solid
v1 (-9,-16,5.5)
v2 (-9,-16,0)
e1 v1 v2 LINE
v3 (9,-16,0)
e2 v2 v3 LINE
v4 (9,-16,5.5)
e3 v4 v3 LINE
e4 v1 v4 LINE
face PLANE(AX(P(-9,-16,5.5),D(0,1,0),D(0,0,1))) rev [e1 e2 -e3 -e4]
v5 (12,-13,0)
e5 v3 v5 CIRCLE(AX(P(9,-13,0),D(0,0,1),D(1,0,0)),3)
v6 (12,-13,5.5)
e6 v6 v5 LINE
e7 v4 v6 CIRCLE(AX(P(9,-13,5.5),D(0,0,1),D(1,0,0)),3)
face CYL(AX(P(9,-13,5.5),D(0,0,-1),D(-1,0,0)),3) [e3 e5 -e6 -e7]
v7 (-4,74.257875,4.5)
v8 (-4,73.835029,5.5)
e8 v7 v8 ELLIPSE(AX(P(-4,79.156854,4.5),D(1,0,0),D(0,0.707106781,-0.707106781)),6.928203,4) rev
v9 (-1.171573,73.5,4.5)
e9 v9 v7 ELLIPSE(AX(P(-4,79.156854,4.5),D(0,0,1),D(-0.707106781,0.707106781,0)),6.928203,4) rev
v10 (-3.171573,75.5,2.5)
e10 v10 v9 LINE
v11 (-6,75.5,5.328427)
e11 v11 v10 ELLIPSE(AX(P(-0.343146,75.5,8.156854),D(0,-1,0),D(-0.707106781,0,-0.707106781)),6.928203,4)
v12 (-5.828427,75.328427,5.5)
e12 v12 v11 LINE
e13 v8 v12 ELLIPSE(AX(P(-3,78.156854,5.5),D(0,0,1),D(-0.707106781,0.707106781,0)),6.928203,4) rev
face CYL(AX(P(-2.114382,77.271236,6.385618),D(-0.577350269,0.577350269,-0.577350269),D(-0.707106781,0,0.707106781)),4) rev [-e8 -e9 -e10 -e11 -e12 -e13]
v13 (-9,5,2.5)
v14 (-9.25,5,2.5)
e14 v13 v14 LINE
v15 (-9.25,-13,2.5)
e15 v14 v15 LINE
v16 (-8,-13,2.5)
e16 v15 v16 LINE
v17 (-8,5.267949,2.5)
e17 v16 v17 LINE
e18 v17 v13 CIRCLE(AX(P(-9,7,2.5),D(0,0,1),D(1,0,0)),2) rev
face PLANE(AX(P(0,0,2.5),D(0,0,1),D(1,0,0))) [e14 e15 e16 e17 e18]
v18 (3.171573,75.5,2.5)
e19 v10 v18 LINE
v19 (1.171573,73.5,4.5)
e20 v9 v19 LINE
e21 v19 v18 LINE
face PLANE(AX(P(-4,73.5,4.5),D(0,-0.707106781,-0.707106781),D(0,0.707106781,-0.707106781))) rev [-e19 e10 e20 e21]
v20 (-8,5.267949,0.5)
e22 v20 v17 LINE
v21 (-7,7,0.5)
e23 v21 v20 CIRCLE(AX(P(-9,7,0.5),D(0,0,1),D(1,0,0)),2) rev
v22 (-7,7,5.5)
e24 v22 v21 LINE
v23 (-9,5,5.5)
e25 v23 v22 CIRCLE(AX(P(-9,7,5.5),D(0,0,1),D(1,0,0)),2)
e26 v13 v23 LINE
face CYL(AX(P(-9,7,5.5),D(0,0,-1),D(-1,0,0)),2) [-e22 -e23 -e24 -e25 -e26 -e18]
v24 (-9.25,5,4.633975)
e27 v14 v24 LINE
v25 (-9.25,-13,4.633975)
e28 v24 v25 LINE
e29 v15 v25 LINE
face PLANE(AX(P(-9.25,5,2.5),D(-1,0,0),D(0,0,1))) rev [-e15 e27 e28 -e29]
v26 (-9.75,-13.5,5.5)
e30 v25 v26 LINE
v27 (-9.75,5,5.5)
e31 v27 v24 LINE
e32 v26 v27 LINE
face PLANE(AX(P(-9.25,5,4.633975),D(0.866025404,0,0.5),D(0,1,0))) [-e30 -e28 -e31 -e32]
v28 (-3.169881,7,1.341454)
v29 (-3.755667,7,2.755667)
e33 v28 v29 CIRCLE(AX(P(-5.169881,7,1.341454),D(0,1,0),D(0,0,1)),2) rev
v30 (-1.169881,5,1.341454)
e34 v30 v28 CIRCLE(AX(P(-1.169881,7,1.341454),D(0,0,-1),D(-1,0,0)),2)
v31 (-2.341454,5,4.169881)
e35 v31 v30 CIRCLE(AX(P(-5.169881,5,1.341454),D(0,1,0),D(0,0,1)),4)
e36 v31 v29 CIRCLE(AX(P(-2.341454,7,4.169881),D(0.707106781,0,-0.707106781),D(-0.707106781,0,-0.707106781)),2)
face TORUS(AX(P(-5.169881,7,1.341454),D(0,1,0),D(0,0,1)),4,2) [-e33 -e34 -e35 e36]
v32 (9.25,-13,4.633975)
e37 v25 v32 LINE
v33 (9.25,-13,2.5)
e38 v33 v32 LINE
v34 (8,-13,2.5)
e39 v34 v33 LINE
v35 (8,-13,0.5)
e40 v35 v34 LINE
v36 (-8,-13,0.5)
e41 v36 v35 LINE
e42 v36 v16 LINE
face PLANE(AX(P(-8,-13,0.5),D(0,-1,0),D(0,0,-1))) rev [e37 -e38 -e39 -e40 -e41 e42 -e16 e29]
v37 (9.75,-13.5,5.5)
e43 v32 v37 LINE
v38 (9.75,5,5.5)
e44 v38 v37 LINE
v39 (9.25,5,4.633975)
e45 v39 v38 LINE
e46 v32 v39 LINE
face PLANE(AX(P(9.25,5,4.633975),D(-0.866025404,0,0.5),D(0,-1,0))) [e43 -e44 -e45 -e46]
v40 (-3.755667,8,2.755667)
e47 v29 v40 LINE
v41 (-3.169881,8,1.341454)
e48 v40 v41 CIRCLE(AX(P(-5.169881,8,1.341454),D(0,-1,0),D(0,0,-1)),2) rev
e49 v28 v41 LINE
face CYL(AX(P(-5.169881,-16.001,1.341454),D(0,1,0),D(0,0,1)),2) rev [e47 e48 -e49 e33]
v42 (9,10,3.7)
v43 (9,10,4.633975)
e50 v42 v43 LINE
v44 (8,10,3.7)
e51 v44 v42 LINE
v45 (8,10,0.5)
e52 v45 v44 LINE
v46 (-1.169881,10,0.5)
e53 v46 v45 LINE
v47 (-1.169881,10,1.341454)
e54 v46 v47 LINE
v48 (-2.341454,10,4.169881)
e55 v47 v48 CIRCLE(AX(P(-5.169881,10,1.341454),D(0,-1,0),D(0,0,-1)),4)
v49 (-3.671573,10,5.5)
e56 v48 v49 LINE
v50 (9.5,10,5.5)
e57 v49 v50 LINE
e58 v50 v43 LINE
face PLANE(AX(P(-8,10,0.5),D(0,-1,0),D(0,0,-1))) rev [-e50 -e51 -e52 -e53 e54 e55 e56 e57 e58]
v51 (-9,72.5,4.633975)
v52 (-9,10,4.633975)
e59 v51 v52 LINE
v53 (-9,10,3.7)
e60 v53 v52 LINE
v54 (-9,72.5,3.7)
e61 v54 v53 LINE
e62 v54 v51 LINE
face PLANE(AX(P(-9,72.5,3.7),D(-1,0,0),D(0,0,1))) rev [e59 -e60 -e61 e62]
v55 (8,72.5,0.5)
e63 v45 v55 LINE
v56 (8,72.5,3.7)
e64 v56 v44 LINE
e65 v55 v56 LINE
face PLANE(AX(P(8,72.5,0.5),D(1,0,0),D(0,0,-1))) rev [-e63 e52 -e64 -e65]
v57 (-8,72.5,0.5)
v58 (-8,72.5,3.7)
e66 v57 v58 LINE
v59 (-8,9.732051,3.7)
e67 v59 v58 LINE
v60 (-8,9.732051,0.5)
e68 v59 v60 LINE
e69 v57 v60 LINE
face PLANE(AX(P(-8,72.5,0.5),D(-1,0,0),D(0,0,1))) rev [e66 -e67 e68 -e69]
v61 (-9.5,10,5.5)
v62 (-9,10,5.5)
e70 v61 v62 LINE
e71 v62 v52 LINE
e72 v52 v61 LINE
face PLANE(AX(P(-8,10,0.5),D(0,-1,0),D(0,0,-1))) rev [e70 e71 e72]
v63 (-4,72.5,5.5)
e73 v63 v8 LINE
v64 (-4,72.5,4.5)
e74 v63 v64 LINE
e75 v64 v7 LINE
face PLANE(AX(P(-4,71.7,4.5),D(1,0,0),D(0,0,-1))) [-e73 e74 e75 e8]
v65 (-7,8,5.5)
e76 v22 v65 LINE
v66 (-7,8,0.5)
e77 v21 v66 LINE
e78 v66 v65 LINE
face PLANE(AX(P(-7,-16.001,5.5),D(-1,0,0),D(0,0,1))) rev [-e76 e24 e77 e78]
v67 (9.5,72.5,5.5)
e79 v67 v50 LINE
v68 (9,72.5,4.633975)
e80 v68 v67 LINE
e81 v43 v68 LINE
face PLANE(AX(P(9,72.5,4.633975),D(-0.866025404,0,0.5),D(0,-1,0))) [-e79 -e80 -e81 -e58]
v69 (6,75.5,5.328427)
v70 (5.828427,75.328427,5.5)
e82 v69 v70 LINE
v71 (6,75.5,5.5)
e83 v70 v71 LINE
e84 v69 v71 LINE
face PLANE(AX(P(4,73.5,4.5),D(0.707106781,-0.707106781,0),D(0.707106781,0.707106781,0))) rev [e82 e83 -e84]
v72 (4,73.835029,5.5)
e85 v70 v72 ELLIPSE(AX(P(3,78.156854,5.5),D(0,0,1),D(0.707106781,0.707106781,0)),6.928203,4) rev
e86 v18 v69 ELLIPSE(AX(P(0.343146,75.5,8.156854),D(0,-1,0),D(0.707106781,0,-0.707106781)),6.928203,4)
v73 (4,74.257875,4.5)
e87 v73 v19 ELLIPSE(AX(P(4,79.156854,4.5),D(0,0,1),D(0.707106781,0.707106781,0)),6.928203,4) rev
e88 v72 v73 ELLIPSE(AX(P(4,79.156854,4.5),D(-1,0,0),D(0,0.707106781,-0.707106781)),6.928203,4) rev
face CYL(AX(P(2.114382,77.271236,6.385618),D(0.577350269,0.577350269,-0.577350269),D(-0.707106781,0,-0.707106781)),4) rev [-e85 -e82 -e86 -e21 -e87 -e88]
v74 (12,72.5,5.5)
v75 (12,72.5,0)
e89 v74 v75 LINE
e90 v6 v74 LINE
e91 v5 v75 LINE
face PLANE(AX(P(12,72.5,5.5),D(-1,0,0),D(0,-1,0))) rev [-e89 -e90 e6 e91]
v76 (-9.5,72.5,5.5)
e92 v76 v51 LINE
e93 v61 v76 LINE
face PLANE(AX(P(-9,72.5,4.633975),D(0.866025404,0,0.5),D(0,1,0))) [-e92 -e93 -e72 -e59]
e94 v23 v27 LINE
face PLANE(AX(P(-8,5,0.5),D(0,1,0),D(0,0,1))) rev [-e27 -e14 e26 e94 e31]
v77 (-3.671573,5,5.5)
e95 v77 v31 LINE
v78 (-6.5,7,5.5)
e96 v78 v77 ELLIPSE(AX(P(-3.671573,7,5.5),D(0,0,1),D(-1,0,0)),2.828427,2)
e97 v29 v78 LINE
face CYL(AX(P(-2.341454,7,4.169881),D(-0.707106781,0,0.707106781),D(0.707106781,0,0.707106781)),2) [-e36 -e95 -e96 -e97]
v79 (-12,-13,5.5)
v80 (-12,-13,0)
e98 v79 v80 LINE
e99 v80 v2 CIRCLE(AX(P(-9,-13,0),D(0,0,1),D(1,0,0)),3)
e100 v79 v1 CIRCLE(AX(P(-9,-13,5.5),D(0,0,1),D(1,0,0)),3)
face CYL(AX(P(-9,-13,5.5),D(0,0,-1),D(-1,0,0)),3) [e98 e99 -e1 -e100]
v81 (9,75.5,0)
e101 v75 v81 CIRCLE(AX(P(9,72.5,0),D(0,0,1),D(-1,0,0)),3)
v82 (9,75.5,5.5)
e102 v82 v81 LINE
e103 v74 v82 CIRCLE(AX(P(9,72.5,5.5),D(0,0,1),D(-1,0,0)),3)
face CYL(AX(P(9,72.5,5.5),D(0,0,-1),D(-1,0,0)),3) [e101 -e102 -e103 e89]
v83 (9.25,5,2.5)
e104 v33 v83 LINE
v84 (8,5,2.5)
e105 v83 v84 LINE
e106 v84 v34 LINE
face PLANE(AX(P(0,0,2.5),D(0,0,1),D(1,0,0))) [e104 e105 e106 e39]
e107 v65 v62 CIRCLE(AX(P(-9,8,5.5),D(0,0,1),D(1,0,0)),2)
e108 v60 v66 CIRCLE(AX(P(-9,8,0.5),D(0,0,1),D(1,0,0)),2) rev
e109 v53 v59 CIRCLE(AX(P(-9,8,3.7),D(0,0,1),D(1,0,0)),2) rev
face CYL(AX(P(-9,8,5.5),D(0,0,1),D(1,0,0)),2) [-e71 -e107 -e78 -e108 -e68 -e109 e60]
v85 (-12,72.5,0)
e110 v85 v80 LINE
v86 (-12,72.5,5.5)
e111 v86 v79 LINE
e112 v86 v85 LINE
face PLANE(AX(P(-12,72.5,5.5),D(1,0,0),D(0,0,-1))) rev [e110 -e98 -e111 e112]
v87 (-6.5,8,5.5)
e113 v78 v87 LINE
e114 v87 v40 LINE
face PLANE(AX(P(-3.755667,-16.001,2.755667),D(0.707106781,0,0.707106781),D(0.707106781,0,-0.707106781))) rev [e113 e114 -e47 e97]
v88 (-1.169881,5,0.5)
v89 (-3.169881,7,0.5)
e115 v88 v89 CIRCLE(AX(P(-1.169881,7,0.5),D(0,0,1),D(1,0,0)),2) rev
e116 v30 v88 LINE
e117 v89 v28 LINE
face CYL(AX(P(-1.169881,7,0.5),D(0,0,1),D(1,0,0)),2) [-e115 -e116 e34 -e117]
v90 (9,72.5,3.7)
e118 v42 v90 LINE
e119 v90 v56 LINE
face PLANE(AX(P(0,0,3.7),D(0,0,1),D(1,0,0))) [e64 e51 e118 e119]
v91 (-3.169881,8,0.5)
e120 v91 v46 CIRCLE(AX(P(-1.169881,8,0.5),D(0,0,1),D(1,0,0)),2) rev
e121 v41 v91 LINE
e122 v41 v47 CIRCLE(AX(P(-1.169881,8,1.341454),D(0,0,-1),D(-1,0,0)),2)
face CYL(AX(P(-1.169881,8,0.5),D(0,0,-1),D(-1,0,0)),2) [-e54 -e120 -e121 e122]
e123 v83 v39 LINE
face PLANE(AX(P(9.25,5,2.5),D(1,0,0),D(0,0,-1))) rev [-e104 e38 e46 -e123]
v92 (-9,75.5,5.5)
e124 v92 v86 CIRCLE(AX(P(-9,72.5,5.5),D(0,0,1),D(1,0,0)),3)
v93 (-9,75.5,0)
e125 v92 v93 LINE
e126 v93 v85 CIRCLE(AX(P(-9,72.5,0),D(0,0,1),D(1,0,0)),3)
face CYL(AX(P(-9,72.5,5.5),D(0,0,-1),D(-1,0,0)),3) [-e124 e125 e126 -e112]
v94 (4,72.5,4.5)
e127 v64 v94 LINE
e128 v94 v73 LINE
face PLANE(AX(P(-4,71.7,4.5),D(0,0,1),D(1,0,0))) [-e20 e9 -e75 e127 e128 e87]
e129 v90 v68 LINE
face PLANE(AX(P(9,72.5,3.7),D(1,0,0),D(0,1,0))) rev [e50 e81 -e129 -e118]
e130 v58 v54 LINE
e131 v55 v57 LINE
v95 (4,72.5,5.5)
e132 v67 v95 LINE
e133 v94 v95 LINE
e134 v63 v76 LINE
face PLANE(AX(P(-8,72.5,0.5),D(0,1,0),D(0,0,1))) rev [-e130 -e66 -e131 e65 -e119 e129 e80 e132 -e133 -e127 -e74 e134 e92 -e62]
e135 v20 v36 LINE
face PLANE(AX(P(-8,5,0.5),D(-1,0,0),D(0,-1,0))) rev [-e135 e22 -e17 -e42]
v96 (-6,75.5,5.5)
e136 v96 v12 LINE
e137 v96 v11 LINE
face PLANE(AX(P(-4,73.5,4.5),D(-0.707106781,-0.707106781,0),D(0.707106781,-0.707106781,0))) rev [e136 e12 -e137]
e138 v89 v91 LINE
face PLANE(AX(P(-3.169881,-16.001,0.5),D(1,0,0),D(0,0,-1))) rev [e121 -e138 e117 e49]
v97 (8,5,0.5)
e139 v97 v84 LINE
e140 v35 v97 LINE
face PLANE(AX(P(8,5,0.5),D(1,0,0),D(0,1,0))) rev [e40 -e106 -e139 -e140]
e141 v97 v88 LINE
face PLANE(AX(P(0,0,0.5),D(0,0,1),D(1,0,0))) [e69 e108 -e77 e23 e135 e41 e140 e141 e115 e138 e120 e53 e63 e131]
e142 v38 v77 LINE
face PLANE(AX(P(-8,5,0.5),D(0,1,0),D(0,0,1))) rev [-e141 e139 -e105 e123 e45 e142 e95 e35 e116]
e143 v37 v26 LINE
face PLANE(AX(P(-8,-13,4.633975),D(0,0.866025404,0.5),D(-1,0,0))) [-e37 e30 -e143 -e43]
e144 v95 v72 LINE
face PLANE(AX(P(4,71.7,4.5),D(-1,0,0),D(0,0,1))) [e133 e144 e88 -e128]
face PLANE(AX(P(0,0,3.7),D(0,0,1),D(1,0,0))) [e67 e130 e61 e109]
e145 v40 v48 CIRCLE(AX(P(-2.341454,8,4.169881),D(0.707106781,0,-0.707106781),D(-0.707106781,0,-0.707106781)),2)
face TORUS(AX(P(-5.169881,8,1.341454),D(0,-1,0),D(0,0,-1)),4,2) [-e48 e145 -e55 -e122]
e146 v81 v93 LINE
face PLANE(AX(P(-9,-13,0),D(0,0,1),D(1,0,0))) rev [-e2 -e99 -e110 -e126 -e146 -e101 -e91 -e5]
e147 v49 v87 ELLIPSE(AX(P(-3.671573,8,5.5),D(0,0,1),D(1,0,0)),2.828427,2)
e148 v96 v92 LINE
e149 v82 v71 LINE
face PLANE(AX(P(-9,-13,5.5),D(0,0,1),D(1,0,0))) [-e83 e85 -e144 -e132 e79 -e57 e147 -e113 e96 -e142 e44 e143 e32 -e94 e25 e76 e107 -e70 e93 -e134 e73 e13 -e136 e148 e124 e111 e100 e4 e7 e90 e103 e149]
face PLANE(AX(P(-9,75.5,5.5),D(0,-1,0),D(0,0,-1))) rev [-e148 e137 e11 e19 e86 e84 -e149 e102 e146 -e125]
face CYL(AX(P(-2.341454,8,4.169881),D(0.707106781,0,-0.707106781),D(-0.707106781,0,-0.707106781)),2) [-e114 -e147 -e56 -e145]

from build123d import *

# Parameters (mm, degrees)
BOSS_EXTRUDE1_DEPTH          = 5.5
SKETCH4_W                    = 16
SKETCH4_H                    = 62.5
SKETCH4_H_2                  = 18
CUT_EXTRUDE1_DEPTH           = 5
SKETCH5_W                    = 18.5
SKETCH5_H                    = 18
CUT_EXTRUDE2_DEPTH           = 3
SKETCH7_W                    = 18
SKETCH7_H                    = 62.5
CUT_EXTRUDE3_DEPTH           = 1.8
CUT_EXTRUDE4_START           = -1
SKETCH10_W                   = 8
SKETCH10_H                   = 1
CUT_EXTRUDE4_DEPTH           = 89.479047827
CUT_EXTRUDE4_TAPER           = -45
CUT_EXTRUDE4_OTHER_WAY_DEPTH = 1.8
FILLET1_R                    = 4
CHAMFER1_SIZE                = 0.5
CHAMFER1_SIZE2               = 0.866025404
CUT_EXTRUDE5_REACH           = 68.817
FILLET2_R                    = 2
FILLET3_R                    = 2


with BuildPart() as part:
    # Sketch2 → Boss-Extrude1 (new body)
    with BuildSketch(Plane.XY):
        with BuildLine():
            Line((-9, 75.5), (9, 75.5))
            ThreePointArc((9, 75.5), (11.121320344, 74.621320344), (12, 72.5))
            Line((12, 72.5), (12, -13))
            ThreePointArc((12, -13), (11.121320344, -15.121320344), (9, -16))
            Line((9, -16), (-9, -16))
            ThreePointArc((-9, -16), (-11.121320344, -15.121320344), (-12, -13))
            Line((-12, -13), (-12, 72.5))
            ThreePointArc((-12, 72.5), (-11.121320344, 74.621320344), (-9, 75.5))
        make_face()
    extrude(amount=BOSS_EXTRUDE1_DEPTH)

    # Sketch4 → Cut-Extrude1 (cut)
    with BuildSketch(Plane.XY.offset(5.5)):
        with Locations((0, 41.25)):
            Rectangle(SKETCH4_W, SKETCH4_H)
        with Locations((0, -4)):
            Rectangle(SKETCH4_W, SKETCH4_H_2)
    extrude(amount=-CUT_EXTRUDE1_DEPTH, mode=Mode.SUBTRACT)

    # Sketch5 → Cut-Extrude2 (cut)
    with BuildSketch(Plane.XY.offset(5.5)):
        with Locations((0, -4)):
            Rectangle(SKETCH5_W, SKETCH5_H)
    extrude(amount=-CUT_EXTRUDE2_DEPTH, mode=Mode.SUBTRACT)

    # Sketch7 → Cut-Extrude3 (cut)
    with BuildSketch(Plane.XY.offset(5.5)):
        with Locations((0, 41.25)):
            Rectangle(SKETCH7_W, SKETCH7_H)
    extrude(amount=-CUT_EXTRUDE3_DEPTH, mode=Mode.SUBTRACT)

    # Sketch10 → Cut-Extrude4 (cut)
    with BuildSketch(Plane.XZ.offset(-72.5).offset(CUT_EXTRUDE4_START)):
        with Locations((0, 5)):
            Rectangle(SKETCH10_W, SKETCH10_H)
    extrude(amount=-CUT_EXTRUDE4_DEPTH, taper=CUT_EXTRUDE4_TAPER, mode=Mode.SUBTRACT)

    # Sketch10 → Cut-Extrude4 other way (cut)
    with BuildSketch(Plane.XZ.offset(-72.5).offset(CUT_EXTRUDE4_START)):
        with Locations((0, 5)):
            Rectangle(SKETCH10_W, SKETCH10_H)
    extrude(amount=CUT_EXTRUDE4_OTHER_WAY_DEPTH, mode=Mode.SUBTRACT)

    # Fillet1
    # the kernel refuses this fillet: 4 mm, written as the material it adds along each edge
    with BuildSketch(Plane(origin=(0.666666667, 70.166666667, 7.833333333), x_dir=(0.4082482904638629, 0.40824829046386407, 0.8164965809277255), z_dir=(0.5773502691896267, 0.5773502691896242, -0.5773502691896265))) as fillet1_piece_1_section:
        with BuildLine():
            CenterArc((FILLET1_R * 0.57735026919, -FILLET1_R), FILLET1_R, 90, 60)
            Line((-FILLET1_R * 0.288675134595, -FILLET1_R * 0.5), (0, 0))
            Line((0, 0), (FILLET1_R * 0.57735026919, 0))
        make_face()
    fillet1_piece_1 = extrude(amount=15.011106999, mode=Mode.PRIVATE)
    fillet1_piece_1 = split(fillet1_piece_1, bisect_by=Plane(origin=(0.666666667, 75.5, 7.833333333), z_dir=(0, -1, 0)), keep=Keep.TOP, mode=Mode.PRIVATE)
    fillet1_piece_1 = split(fillet1_piece_1, bisect_by=Plane(origin=(4, 70.166666667, 7.833333333), z_dir=(-1, 0, 0)), keep=Keep.TOP, mode=Mode.PRIVATE)
    fillet1_piece_1 = split(fillet1_piece_1, bisect_by=Plane(origin=(0.666666667, 70.166666667, 4.5), z_dir=(0, 0, -1)), keep=Keep.TOP, mode=Mode.PRIVATE)
    add(fillet1_piece_1)
    with BuildSketch(Plane(origin=(0.666666667, 70.166666667, 7.833333333), x_dir=(0.4082482904638629, 0.40824829046386407, 0.8164965809277255), z_dir=(0.5773502691896267, 0.5773502691896242, -0.5773502691896265))) as fillet1_piece_2_section:
        with BuildLine():
            CenterArc((FILLET1_R * 0.57735026919, -FILLET1_R), FILLET1_R, 90, 60)
            Line((-FILLET1_R * 0.288675134595, -FILLET1_R * 0.5), (0, 0))
            Line((0, 0), (FILLET1_R * 0.57735026919, 0))
        make_face()
    fillet1_piece_2 = extrude(amount=15.011106999, mode=Mode.PRIVATE)
    fillet1_piece_2 = split(fillet1_piece_2, bisect_by=Plane(origin=(0.666666667, 75.5, 7.833333333), z_dir=(0, -1, 0)), keep=Keep.TOP, mode=Mode.PRIVATE)
    fillet1_piece_2 = split(fillet1_piece_2, bisect_by=Plane(origin=(0.666666667, 70.166666667, 5.5), z_dir=(0, 0, -1)), keep=Keep.TOP, mode=Mode.PRIVATE)
    fillet1_piece_2 = split(fillet1_piece_2, bisect_by=Plane(origin=(4, 70.166666667, 7.833333333), z_dir=(1, 0, 0)), keep=Keep.TOP, mode=Mode.PRIVATE)
    fillet1_piece_2 = split(fillet1_piece_2, bisect_by=Plane(origin=(0.666666667, 70.166666667, 4.5), z_dir=(0, 0, 1)), keep=Keep.TOP, mode=Mode.PRIVATE)
    add(fillet1_piece_2)
    with BuildSketch(Plane(origin=(0.666666667, 70.166666667, 7.833333333), x_dir=(0.4082482904638629, 0.40824829046386407, 0.8164965809277255), z_dir=(0.5773502691896267, 0.5773502691896242, -0.5773502691896265))) as fillet1_piece_3_section:
        with BuildLine():
            CenterArc((FILLET1_R * 0.57735026919, -FILLET1_R), FILLET1_R, 90, 60)
            Line((-FILLET1_R * 0.288675134595, -FILLET1_R * 0.5), (0, 0))
            Line((0, 0), (FILLET1_R * 0.57735026919, 0))
        make_face()
    fillet1_piece_3 = extrude(amount=15.011106999, mode=Mode.PRIVATE)
    fillet1_piece_3 = split(fillet1_piece_3, bisect_by=Plane(origin=(0.666666667, 75.5, 7.833333333), z_dir=(0, -1, 0)), keep=Keep.TOP, mode=Mode.PRIVATE)
    fillet1_piece_3 = split(fillet1_piece_3, bisect_by=Plane(origin=(4, 70.166666667, 7.833333333), z_dir=(1, 0, 0)), keep=Keep.TOP, mode=Mode.PRIVATE)
    fillet1_piece_3 = split(fillet1_piece_3, bisect_by=Plane(origin=(0.666666667, 70.166666667, 4.5), z_dir=(0, 0, -1)), keep=Keep.TOP, mode=Mode.PRIVATE)
    add(fillet1_piece_3)
    with BuildSketch(Plane(origin=(-0.666666667, 70.166666667, 7.833333333), x_dir=(0.8164965809277253, 0.40824829046386424, -0.4082482904638631), z_dir=(-0.5773502691896267, 0.5773502691896242, -0.5773502691896265))) as fillet1_piece_4_section:
        with BuildLine():
            CenterArc((FILLET1_R * 0.57735026919, -FILLET1_R), FILLET1_R, 90, 60)
            Line((-FILLET1_R * 0.288675134595, -FILLET1_R * 0.5), (0, 0))
            Line((0, 0), (FILLET1_R * 0.57735026919, 0))
        make_face()
    fillet1_piece_4 = extrude(amount=15.011106999, mode=Mode.PRIVATE)
    fillet1_piece_4 = split(fillet1_piece_4, bisect_by=Plane(origin=(-0.666666667, 75.5, 7.833333333), z_dir=(0, -1, 0)), keep=Keep.TOP, mode=Mode.PRIVATE)
    fillet1_piece_4 = split(fillet1_piece_4, bisect_by=Plane(origin=(-0.666666667, 70.166666667, 5.5), z_dir=(0, 0, -1)), keep=Keep.TOP, mode=Mode.PRIVATE)
    fillet1_piece_4 = split(fillet1_piece_4, bisect_by=Plane(origin=(-0.666666667, 70.166666667, 4.5), z_dir=(0, 0, 1)), keep=Keep.TOP, mode=Mode.PRIVATE)
    fillet1_piece_4 = split(fillet1_piece_4, bisect_by=Plane(origin=(-4, 70.166666667, 7.833333333), z_dir=(-1, 0, 0)), keep=Keep.TOP, mode=Mode.PRIVATE)
    add(fillet1_piece_4)
    with BuildSketch(Plane(origin=(-0.666666667, 70.166666667, 7.833333333), x_dir=(0.8164965809277253, 0.40824829046386424, -0.4082482904638631), z_dir=(-0.5773502691896267, 0.5773502691896242, -0.5773502691896265))) as fillet1_piece_5_section:
        with BuildLine():
            CenterArc((FILLET1_R * 0.57735026919, -FILLET1_R), FILLET1_R, 90, 60)
            Line((-FILLET1_R * 0.288675134595, -FILLET1_R * 0.5), (0, 0))
            Line((0, 0), (FILLET1_R * 0.57735026919, 0))
        make_face()
    fillet1_piece_5 = extrude(amount=15.011106999, mode=Mode.PRIVATE)
    fillet1_piece_5 = split(fillet1_piece_5, bisect_by=Plane(origin=(-0.666666667, 75.5, 7.833333333), z_dir=(0, -1, 0)), keep=Keep.TOP, mode=Mode.PRIVATE)
    fillet1_piece_5 = split(fillet1_piece_5, bisect_by=Plane(origin=(-0.666666667, 70.166666667, 4.5), z_dir=(0, 0, -1)), keep=Keep.TOP, mode=Mode.PRIVATE)
    fillet1_piece_5 = split(fillet1_piece_5, bisect_by=Plane(origin=(-4, 70.166666667, 7.833333333), z_dir=(1, 0, 0)), keep=Keep.TOP, mode=Mode.PRIVATE)
    add(fillet1_piece_5)
    with BuildSketch(Plane(origin=(-0.666666667, 70.166666667, 7.833333333), x_dir=(0.8164965809277253, 0.40824829046386424, -0.4082482904638631), z_dir=(-0.5773502691896267, 0.5773502691896242, -0.5773502691896265))) as fillet1_piece_6_section:
        with BuildLine():
            CenterArc((FILLET1_R * 0.57735026919, -FILLET1_R), FILLET1_R, 90, 60)
            Line((-FILLET1_R * 0.288675134595, -FILLET1_R * 0.5), (0, 0))
            Line((0, 0), (FILLET1_R * 0.57735026919, 0))
        make_face()
    fillet1_piece_6 = extrude(amount=15.011106999, mode=Mode.PRIVATE)
    fillet1_piece_6 = split(fillet1_piece_6, bisect_by=Plane(origin=(-0.666666667, 75.5, 7.833333333), z_dir=(0, -1, 0)), keep=Keep.TOP, mode=Mode.PRIVATE)
    fillet1_piece_6 = split(fillet1_piece_6, bisect_by=Plane(origin=(-0.666666667, 70.166666667, 4.5), z_dir=(0, 0, -1)), keep=Keep.TOP, mode=Mode.PRIVATE)
    fillet1_piece_6 = split(fillet1_piece_6, bisect_by=Plane(origin=(-4, 70.166666667, 7.833333333), z_dir=(-1, 0, 0)), keep=Keep.TOP, mode=Mode.PRIVATE)
    add(fillet1_piece_6)

    # Chamfer1
    chamfer1_edges = [part.edges().sort_by_distance(p)[0] for p in [
        (0, -13, 5.5),
        (-9.25, -4, 5.5),
        (9.25, -4, 5.5),
        (-9, 41.25, 5.5),
        (9, 41.25, 5.5),
    ]]
    chamfer1_side = [part.faces().sort_by_distance(p)[0] for p in [
        (-5.551441315, 73.803006174, 5.5),
    ]]
    chamfer(chamfer1_edges, length=CHAMFER1_SIZE, length2=CHAMFER1_SIZE2, reference=chamfer1_side[0])

    # Sketch11 → Cut-Extrude5 (cut, up to next)
    with BuildSketch(Plane(origin=(0, 10, 0), x_dir=(1, 0, 0), z_dir=(0, 1, 0)), mode=Mode.PRIVATE) as cut_extrude5_sk1:
        with BuildLine():
            Line((-7, -5.5), (-7, -0.5))
            Line((-7, -0.5), (-3.169880661, -0.5))
            Line((-3.169880661, -0.5), (-3.169880661, -1.341453537))
            ThreePointArc((-3.169880661, -1.341453537), (-3.322121596, -2.106820401), (-3.755667099, -2.755667099))
            Line((-3.755667099, -2.755667099), (-6.5, -5.5))
            Line((-6.5, -5.5), (-7, -5.5))
        make_face()
    cut_extrude5_tool1 = extrude(cut_extrude5_sk1.sketch, amount=-CUT_EXTRUDE5_REACH, mode=Mode.PRIVATE) & part.part
    add(cut_extrude5_tool1.solids().sort_by_distance((-5.426528, 10, 2.435535))[0], mode=Mode.SUBTRACT)

    # Fillet2
    fillet2_edges = [part.edges().sort_by_distance(p)[0] for p in [
        (-3.169880661, 5, 0.920726768),
        (-3.322121596, 5, 2.106820401),
        (-5.12783355, 5, 4.12783355),
        (-5.12783355, 10, 4.12783355),
        (-3.322121596, 10, 2.106820401),
        (-3.169880661, 10, 0.920726768),
    ]]
    fillet(fillet2_edges, radius=FILLET2_R)

    # Fillet3
    fillet3_edges = [part.edges().sort_by_distance(p)[0] for p in [
        (-7, 10, 3),
        (-7, 5, 3),
    ]]
    fillet(fillet3_edges, radius=FILLET3_R)


solid = part.part
